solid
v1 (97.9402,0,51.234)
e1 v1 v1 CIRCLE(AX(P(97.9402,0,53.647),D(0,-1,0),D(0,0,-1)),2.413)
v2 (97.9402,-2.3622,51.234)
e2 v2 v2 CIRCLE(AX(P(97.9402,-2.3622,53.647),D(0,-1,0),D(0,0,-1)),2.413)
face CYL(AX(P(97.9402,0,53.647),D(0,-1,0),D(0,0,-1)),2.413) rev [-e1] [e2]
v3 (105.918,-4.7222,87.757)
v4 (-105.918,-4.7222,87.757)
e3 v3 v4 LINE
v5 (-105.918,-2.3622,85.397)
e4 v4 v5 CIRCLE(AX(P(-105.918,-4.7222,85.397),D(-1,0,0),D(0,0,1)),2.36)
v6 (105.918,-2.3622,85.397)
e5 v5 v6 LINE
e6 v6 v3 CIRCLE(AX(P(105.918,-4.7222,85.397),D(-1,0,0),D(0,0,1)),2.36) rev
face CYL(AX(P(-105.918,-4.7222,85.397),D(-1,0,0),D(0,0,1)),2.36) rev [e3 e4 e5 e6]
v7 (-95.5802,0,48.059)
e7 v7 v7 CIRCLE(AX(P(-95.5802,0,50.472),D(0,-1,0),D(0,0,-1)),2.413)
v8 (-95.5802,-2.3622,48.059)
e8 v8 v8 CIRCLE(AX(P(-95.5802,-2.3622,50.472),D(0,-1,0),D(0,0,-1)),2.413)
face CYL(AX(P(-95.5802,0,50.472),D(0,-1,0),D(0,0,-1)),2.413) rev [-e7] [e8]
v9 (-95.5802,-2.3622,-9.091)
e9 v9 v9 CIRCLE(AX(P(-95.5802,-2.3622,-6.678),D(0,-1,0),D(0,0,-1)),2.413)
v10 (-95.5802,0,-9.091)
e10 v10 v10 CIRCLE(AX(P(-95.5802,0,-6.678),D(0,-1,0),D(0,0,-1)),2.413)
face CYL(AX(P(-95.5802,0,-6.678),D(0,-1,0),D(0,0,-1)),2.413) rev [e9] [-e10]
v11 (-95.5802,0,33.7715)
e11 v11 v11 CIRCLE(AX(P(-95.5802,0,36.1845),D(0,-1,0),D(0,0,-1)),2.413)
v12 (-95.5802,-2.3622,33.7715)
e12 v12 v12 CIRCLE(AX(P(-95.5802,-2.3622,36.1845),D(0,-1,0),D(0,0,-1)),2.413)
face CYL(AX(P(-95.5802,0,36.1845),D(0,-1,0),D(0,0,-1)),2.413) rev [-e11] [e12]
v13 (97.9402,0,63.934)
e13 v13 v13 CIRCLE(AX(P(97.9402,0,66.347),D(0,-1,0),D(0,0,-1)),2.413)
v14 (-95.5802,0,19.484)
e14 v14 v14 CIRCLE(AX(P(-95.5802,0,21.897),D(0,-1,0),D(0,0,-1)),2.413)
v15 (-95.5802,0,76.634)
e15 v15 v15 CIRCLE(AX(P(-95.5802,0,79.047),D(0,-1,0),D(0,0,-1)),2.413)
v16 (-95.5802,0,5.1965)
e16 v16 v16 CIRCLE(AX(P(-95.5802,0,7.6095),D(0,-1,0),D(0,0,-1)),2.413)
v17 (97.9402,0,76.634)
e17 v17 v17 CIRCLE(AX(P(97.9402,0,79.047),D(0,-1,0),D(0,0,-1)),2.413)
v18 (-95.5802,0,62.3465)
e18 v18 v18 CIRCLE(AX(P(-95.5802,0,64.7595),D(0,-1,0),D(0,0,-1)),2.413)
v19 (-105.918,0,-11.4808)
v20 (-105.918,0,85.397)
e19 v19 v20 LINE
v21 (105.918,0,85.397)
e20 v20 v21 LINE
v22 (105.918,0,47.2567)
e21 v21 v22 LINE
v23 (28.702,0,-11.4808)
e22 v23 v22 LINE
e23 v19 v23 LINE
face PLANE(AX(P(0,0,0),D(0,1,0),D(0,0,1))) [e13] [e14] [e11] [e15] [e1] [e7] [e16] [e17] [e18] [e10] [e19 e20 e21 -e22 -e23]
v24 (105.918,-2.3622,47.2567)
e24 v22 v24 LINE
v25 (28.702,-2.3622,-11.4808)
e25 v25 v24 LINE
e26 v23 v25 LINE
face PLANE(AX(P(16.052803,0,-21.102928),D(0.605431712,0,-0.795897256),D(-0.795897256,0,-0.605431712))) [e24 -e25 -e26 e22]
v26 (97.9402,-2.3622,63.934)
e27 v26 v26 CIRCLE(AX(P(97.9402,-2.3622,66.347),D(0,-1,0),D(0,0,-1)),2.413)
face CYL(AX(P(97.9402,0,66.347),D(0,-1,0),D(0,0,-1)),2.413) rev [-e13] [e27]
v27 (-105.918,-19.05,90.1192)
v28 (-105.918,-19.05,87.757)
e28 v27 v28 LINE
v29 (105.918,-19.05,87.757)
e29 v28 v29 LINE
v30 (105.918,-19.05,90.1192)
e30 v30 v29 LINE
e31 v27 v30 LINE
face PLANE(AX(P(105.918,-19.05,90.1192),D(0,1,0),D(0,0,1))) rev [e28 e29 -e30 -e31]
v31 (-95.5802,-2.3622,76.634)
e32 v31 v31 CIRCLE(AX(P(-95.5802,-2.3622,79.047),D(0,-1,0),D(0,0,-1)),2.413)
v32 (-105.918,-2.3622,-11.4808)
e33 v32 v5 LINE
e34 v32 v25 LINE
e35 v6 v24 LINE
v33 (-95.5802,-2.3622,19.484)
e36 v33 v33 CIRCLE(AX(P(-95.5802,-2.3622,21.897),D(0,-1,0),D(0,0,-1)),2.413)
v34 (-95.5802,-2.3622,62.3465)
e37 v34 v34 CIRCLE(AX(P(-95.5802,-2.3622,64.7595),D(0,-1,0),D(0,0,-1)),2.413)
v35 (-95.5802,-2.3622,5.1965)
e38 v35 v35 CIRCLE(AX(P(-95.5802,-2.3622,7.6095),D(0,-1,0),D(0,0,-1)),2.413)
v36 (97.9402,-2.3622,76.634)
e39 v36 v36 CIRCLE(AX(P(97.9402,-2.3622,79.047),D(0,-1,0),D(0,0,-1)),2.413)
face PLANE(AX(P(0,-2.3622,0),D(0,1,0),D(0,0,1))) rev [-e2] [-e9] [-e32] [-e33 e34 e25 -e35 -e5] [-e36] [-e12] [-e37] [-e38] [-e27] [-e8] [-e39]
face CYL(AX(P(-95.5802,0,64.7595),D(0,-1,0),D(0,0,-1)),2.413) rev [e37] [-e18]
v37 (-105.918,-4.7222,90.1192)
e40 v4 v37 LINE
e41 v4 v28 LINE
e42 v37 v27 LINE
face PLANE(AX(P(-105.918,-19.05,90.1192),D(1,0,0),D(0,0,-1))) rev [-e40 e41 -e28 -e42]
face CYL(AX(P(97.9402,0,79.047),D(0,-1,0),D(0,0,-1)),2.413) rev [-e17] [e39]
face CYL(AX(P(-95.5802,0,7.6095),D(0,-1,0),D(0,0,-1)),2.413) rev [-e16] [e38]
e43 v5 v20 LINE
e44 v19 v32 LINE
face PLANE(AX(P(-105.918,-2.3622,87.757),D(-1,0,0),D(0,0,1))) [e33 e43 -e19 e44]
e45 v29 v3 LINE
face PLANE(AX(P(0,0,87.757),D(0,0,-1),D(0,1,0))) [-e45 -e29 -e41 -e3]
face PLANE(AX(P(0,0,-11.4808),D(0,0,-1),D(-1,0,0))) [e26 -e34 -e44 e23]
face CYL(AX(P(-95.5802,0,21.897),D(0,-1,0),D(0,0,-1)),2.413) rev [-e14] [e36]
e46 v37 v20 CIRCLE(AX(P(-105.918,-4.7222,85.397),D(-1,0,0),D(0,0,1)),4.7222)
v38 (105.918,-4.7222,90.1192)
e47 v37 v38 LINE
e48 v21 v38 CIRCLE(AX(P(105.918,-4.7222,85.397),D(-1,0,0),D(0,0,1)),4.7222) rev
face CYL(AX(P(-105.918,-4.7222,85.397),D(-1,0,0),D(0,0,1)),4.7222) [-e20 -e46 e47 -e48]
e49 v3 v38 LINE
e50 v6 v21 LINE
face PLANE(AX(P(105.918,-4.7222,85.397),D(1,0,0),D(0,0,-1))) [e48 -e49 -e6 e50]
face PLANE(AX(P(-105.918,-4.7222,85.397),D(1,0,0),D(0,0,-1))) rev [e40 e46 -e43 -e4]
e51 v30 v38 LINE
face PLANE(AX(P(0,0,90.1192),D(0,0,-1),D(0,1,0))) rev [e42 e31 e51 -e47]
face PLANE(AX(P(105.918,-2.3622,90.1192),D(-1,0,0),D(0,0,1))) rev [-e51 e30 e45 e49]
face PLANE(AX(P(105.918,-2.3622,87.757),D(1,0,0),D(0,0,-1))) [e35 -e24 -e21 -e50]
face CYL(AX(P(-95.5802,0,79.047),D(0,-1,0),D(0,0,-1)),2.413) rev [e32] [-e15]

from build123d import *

# Parameters (mm, degrees)
SKETCH1_W                    = 211.836
SKETCH1_H                    = 175.514
BASE_FLANGE1_DEPTH           = 2.3622
EDGE_FLANGE4_STRIP_W         = 14.1688
EDGE_FLANGE4_STRIP_H         = 2.3622
EDGE_FLANGE4_STRIP_CUT_DEPTH = 211.836
EDGE_FLANGE4_DEPTH           = 211.836
CUT_EXTRUDE1_DEPTH           = 141.066325723
SKETCH38_R                   = 2.413
CUT_EXTRUDE3_DEPTH           = 141.066325723
SKETCH40_R                   = 2.413
CUT_EXTRUDE4_DEPTH           = 141.066325723


# Sheet-metal steps are written as plain solids
with BuildPart() as part:
    # Sketch1 → Base-Flange1 (new body)
    with BuildSketch(Plane(origin=(0, 0, 0), x_dir=(1, 0, 0), z_dir=(0, 1, 0))):
        Rectangle(SKETCH1_W, SKETCH1_H)
    extrude(amount=-BASE_FLANGE1_DEPTH)

    # Edge-Flange4 strip (across the edge) → Edge-Flange4 strip cut (cut)
    with BuildSketch(Plane(origin=(105.918, -2.3622, 87.757), x_dir=(0, 0, -1), z_dir=(-1, 0, 0))):
        with Locations((-4.7244, -1.1811)):
            Rectangle(EDGE_FLANGE4_STRIP_W, EDGE_FLANGE4_STRIP_H)
    extrude(amount=EDGE_FLANGE4_STRIP_CUT_DEPTH, mode=Mode.SUBTRACT)

    # Edge-Flange4 section (across the edge) → Edge-Flange4 (add)
    with BuildSketch(Plane(origin=(105.918, -2.3622, 87.757), x_dir=(0, 0, -1), z_dir=(-1, 0, 0))):
        with BuildLine():
            Line((-2.3622, 2.36), (-2.3622, 16.6878))
            Line((-2.3622, 16.6878), (0, 16.6878))
            Line((0, 16.6878), (0, 2.36))
            ThreePointArc((0, 2.36), (0.691227996, 0.691227996), (2.36, 0))
            Line((2.36, 0), (2.36, -2.3622))
            ThreePointArc((2.36, -2.3622), (-0.979099642, -0.979099642), (-2.3622, 2.36))
        make_face()
    extrude(amount=EDGE_FLANGE4_DEPTH)

    # Sketch36 → Cut-Extrude1 (cut, through all)
    with BuildSketch(Plane.XZ.offset(2.3622)):
        Polygon((28.702, -11.4808), (-105.918, -11.4808), (-105.918, -87.757), (105.918, -87.757), (105.918, 47.2567), align=None)
    extrude(amount=-CUT_EXTRUDE1_DEPTH, mode=Mode.SUBTRACT)

    # Sketch38 → Cut-Extrude3 (cut, through all)
    with BuildSketch(Plane.XZ.offset(2.3622)):
        with Locations(Location((97.9402, 79.047, 0), (0, 0, 270))):
            Circle(SKETCH38_R)
        with Locations(Location((97.9402, 66.347, 0), (0, 0, 270))):
            Circle(SKETCH38_R)
        with Locations(Location((97.9402, 53.647, 0), (0, 0, 270))):
            Circle(SKETCH38_R)
    extrude(amount=-CUT_EXTRUDE3_DEPTH, mode=Mode.SUBTRACT)

    # Sketch40 → Cut-Extrude4 (cut, through all)
    with BuildSketch(Plane.XZ.offset(2.3622)):
        with Locations(Location((-95.5802, 79.047, 0), (0, 0, 270))):
            Circle(SKETCH40_R)
        with Locations(Location((-95.5802, 64.7595, 0), (0, 0, 270))):
            Circle(SKETCH40_R)
        with Locations(Location((-95.5802, 50.472, 0), (0, 0, 270))):
            Circle(SKETCH40_R)
        with Locations(Location((-95.5802, 36.1845, 0), (0, 0, 270))):
            Circle(SKETCH40_R)
        with Locations(Location((-95.5802, 21.897, 0), (0, 0, 270))):
            Circle(SKETCH40_R)
        with Locations(Location((-95.5802, 7.6095, 0), (0, 0, 270))):
            Circle(SKETCH40_R)
        with Locations(Location((-95.5802, -6.678, 0), (0, 0, 270))):
            Circle(SKETCH40_R)
    extrude(amount=-CUT_EXTRUDE4_DEPTH, mode=Mode.SUBTRACT)


solid = part.part
